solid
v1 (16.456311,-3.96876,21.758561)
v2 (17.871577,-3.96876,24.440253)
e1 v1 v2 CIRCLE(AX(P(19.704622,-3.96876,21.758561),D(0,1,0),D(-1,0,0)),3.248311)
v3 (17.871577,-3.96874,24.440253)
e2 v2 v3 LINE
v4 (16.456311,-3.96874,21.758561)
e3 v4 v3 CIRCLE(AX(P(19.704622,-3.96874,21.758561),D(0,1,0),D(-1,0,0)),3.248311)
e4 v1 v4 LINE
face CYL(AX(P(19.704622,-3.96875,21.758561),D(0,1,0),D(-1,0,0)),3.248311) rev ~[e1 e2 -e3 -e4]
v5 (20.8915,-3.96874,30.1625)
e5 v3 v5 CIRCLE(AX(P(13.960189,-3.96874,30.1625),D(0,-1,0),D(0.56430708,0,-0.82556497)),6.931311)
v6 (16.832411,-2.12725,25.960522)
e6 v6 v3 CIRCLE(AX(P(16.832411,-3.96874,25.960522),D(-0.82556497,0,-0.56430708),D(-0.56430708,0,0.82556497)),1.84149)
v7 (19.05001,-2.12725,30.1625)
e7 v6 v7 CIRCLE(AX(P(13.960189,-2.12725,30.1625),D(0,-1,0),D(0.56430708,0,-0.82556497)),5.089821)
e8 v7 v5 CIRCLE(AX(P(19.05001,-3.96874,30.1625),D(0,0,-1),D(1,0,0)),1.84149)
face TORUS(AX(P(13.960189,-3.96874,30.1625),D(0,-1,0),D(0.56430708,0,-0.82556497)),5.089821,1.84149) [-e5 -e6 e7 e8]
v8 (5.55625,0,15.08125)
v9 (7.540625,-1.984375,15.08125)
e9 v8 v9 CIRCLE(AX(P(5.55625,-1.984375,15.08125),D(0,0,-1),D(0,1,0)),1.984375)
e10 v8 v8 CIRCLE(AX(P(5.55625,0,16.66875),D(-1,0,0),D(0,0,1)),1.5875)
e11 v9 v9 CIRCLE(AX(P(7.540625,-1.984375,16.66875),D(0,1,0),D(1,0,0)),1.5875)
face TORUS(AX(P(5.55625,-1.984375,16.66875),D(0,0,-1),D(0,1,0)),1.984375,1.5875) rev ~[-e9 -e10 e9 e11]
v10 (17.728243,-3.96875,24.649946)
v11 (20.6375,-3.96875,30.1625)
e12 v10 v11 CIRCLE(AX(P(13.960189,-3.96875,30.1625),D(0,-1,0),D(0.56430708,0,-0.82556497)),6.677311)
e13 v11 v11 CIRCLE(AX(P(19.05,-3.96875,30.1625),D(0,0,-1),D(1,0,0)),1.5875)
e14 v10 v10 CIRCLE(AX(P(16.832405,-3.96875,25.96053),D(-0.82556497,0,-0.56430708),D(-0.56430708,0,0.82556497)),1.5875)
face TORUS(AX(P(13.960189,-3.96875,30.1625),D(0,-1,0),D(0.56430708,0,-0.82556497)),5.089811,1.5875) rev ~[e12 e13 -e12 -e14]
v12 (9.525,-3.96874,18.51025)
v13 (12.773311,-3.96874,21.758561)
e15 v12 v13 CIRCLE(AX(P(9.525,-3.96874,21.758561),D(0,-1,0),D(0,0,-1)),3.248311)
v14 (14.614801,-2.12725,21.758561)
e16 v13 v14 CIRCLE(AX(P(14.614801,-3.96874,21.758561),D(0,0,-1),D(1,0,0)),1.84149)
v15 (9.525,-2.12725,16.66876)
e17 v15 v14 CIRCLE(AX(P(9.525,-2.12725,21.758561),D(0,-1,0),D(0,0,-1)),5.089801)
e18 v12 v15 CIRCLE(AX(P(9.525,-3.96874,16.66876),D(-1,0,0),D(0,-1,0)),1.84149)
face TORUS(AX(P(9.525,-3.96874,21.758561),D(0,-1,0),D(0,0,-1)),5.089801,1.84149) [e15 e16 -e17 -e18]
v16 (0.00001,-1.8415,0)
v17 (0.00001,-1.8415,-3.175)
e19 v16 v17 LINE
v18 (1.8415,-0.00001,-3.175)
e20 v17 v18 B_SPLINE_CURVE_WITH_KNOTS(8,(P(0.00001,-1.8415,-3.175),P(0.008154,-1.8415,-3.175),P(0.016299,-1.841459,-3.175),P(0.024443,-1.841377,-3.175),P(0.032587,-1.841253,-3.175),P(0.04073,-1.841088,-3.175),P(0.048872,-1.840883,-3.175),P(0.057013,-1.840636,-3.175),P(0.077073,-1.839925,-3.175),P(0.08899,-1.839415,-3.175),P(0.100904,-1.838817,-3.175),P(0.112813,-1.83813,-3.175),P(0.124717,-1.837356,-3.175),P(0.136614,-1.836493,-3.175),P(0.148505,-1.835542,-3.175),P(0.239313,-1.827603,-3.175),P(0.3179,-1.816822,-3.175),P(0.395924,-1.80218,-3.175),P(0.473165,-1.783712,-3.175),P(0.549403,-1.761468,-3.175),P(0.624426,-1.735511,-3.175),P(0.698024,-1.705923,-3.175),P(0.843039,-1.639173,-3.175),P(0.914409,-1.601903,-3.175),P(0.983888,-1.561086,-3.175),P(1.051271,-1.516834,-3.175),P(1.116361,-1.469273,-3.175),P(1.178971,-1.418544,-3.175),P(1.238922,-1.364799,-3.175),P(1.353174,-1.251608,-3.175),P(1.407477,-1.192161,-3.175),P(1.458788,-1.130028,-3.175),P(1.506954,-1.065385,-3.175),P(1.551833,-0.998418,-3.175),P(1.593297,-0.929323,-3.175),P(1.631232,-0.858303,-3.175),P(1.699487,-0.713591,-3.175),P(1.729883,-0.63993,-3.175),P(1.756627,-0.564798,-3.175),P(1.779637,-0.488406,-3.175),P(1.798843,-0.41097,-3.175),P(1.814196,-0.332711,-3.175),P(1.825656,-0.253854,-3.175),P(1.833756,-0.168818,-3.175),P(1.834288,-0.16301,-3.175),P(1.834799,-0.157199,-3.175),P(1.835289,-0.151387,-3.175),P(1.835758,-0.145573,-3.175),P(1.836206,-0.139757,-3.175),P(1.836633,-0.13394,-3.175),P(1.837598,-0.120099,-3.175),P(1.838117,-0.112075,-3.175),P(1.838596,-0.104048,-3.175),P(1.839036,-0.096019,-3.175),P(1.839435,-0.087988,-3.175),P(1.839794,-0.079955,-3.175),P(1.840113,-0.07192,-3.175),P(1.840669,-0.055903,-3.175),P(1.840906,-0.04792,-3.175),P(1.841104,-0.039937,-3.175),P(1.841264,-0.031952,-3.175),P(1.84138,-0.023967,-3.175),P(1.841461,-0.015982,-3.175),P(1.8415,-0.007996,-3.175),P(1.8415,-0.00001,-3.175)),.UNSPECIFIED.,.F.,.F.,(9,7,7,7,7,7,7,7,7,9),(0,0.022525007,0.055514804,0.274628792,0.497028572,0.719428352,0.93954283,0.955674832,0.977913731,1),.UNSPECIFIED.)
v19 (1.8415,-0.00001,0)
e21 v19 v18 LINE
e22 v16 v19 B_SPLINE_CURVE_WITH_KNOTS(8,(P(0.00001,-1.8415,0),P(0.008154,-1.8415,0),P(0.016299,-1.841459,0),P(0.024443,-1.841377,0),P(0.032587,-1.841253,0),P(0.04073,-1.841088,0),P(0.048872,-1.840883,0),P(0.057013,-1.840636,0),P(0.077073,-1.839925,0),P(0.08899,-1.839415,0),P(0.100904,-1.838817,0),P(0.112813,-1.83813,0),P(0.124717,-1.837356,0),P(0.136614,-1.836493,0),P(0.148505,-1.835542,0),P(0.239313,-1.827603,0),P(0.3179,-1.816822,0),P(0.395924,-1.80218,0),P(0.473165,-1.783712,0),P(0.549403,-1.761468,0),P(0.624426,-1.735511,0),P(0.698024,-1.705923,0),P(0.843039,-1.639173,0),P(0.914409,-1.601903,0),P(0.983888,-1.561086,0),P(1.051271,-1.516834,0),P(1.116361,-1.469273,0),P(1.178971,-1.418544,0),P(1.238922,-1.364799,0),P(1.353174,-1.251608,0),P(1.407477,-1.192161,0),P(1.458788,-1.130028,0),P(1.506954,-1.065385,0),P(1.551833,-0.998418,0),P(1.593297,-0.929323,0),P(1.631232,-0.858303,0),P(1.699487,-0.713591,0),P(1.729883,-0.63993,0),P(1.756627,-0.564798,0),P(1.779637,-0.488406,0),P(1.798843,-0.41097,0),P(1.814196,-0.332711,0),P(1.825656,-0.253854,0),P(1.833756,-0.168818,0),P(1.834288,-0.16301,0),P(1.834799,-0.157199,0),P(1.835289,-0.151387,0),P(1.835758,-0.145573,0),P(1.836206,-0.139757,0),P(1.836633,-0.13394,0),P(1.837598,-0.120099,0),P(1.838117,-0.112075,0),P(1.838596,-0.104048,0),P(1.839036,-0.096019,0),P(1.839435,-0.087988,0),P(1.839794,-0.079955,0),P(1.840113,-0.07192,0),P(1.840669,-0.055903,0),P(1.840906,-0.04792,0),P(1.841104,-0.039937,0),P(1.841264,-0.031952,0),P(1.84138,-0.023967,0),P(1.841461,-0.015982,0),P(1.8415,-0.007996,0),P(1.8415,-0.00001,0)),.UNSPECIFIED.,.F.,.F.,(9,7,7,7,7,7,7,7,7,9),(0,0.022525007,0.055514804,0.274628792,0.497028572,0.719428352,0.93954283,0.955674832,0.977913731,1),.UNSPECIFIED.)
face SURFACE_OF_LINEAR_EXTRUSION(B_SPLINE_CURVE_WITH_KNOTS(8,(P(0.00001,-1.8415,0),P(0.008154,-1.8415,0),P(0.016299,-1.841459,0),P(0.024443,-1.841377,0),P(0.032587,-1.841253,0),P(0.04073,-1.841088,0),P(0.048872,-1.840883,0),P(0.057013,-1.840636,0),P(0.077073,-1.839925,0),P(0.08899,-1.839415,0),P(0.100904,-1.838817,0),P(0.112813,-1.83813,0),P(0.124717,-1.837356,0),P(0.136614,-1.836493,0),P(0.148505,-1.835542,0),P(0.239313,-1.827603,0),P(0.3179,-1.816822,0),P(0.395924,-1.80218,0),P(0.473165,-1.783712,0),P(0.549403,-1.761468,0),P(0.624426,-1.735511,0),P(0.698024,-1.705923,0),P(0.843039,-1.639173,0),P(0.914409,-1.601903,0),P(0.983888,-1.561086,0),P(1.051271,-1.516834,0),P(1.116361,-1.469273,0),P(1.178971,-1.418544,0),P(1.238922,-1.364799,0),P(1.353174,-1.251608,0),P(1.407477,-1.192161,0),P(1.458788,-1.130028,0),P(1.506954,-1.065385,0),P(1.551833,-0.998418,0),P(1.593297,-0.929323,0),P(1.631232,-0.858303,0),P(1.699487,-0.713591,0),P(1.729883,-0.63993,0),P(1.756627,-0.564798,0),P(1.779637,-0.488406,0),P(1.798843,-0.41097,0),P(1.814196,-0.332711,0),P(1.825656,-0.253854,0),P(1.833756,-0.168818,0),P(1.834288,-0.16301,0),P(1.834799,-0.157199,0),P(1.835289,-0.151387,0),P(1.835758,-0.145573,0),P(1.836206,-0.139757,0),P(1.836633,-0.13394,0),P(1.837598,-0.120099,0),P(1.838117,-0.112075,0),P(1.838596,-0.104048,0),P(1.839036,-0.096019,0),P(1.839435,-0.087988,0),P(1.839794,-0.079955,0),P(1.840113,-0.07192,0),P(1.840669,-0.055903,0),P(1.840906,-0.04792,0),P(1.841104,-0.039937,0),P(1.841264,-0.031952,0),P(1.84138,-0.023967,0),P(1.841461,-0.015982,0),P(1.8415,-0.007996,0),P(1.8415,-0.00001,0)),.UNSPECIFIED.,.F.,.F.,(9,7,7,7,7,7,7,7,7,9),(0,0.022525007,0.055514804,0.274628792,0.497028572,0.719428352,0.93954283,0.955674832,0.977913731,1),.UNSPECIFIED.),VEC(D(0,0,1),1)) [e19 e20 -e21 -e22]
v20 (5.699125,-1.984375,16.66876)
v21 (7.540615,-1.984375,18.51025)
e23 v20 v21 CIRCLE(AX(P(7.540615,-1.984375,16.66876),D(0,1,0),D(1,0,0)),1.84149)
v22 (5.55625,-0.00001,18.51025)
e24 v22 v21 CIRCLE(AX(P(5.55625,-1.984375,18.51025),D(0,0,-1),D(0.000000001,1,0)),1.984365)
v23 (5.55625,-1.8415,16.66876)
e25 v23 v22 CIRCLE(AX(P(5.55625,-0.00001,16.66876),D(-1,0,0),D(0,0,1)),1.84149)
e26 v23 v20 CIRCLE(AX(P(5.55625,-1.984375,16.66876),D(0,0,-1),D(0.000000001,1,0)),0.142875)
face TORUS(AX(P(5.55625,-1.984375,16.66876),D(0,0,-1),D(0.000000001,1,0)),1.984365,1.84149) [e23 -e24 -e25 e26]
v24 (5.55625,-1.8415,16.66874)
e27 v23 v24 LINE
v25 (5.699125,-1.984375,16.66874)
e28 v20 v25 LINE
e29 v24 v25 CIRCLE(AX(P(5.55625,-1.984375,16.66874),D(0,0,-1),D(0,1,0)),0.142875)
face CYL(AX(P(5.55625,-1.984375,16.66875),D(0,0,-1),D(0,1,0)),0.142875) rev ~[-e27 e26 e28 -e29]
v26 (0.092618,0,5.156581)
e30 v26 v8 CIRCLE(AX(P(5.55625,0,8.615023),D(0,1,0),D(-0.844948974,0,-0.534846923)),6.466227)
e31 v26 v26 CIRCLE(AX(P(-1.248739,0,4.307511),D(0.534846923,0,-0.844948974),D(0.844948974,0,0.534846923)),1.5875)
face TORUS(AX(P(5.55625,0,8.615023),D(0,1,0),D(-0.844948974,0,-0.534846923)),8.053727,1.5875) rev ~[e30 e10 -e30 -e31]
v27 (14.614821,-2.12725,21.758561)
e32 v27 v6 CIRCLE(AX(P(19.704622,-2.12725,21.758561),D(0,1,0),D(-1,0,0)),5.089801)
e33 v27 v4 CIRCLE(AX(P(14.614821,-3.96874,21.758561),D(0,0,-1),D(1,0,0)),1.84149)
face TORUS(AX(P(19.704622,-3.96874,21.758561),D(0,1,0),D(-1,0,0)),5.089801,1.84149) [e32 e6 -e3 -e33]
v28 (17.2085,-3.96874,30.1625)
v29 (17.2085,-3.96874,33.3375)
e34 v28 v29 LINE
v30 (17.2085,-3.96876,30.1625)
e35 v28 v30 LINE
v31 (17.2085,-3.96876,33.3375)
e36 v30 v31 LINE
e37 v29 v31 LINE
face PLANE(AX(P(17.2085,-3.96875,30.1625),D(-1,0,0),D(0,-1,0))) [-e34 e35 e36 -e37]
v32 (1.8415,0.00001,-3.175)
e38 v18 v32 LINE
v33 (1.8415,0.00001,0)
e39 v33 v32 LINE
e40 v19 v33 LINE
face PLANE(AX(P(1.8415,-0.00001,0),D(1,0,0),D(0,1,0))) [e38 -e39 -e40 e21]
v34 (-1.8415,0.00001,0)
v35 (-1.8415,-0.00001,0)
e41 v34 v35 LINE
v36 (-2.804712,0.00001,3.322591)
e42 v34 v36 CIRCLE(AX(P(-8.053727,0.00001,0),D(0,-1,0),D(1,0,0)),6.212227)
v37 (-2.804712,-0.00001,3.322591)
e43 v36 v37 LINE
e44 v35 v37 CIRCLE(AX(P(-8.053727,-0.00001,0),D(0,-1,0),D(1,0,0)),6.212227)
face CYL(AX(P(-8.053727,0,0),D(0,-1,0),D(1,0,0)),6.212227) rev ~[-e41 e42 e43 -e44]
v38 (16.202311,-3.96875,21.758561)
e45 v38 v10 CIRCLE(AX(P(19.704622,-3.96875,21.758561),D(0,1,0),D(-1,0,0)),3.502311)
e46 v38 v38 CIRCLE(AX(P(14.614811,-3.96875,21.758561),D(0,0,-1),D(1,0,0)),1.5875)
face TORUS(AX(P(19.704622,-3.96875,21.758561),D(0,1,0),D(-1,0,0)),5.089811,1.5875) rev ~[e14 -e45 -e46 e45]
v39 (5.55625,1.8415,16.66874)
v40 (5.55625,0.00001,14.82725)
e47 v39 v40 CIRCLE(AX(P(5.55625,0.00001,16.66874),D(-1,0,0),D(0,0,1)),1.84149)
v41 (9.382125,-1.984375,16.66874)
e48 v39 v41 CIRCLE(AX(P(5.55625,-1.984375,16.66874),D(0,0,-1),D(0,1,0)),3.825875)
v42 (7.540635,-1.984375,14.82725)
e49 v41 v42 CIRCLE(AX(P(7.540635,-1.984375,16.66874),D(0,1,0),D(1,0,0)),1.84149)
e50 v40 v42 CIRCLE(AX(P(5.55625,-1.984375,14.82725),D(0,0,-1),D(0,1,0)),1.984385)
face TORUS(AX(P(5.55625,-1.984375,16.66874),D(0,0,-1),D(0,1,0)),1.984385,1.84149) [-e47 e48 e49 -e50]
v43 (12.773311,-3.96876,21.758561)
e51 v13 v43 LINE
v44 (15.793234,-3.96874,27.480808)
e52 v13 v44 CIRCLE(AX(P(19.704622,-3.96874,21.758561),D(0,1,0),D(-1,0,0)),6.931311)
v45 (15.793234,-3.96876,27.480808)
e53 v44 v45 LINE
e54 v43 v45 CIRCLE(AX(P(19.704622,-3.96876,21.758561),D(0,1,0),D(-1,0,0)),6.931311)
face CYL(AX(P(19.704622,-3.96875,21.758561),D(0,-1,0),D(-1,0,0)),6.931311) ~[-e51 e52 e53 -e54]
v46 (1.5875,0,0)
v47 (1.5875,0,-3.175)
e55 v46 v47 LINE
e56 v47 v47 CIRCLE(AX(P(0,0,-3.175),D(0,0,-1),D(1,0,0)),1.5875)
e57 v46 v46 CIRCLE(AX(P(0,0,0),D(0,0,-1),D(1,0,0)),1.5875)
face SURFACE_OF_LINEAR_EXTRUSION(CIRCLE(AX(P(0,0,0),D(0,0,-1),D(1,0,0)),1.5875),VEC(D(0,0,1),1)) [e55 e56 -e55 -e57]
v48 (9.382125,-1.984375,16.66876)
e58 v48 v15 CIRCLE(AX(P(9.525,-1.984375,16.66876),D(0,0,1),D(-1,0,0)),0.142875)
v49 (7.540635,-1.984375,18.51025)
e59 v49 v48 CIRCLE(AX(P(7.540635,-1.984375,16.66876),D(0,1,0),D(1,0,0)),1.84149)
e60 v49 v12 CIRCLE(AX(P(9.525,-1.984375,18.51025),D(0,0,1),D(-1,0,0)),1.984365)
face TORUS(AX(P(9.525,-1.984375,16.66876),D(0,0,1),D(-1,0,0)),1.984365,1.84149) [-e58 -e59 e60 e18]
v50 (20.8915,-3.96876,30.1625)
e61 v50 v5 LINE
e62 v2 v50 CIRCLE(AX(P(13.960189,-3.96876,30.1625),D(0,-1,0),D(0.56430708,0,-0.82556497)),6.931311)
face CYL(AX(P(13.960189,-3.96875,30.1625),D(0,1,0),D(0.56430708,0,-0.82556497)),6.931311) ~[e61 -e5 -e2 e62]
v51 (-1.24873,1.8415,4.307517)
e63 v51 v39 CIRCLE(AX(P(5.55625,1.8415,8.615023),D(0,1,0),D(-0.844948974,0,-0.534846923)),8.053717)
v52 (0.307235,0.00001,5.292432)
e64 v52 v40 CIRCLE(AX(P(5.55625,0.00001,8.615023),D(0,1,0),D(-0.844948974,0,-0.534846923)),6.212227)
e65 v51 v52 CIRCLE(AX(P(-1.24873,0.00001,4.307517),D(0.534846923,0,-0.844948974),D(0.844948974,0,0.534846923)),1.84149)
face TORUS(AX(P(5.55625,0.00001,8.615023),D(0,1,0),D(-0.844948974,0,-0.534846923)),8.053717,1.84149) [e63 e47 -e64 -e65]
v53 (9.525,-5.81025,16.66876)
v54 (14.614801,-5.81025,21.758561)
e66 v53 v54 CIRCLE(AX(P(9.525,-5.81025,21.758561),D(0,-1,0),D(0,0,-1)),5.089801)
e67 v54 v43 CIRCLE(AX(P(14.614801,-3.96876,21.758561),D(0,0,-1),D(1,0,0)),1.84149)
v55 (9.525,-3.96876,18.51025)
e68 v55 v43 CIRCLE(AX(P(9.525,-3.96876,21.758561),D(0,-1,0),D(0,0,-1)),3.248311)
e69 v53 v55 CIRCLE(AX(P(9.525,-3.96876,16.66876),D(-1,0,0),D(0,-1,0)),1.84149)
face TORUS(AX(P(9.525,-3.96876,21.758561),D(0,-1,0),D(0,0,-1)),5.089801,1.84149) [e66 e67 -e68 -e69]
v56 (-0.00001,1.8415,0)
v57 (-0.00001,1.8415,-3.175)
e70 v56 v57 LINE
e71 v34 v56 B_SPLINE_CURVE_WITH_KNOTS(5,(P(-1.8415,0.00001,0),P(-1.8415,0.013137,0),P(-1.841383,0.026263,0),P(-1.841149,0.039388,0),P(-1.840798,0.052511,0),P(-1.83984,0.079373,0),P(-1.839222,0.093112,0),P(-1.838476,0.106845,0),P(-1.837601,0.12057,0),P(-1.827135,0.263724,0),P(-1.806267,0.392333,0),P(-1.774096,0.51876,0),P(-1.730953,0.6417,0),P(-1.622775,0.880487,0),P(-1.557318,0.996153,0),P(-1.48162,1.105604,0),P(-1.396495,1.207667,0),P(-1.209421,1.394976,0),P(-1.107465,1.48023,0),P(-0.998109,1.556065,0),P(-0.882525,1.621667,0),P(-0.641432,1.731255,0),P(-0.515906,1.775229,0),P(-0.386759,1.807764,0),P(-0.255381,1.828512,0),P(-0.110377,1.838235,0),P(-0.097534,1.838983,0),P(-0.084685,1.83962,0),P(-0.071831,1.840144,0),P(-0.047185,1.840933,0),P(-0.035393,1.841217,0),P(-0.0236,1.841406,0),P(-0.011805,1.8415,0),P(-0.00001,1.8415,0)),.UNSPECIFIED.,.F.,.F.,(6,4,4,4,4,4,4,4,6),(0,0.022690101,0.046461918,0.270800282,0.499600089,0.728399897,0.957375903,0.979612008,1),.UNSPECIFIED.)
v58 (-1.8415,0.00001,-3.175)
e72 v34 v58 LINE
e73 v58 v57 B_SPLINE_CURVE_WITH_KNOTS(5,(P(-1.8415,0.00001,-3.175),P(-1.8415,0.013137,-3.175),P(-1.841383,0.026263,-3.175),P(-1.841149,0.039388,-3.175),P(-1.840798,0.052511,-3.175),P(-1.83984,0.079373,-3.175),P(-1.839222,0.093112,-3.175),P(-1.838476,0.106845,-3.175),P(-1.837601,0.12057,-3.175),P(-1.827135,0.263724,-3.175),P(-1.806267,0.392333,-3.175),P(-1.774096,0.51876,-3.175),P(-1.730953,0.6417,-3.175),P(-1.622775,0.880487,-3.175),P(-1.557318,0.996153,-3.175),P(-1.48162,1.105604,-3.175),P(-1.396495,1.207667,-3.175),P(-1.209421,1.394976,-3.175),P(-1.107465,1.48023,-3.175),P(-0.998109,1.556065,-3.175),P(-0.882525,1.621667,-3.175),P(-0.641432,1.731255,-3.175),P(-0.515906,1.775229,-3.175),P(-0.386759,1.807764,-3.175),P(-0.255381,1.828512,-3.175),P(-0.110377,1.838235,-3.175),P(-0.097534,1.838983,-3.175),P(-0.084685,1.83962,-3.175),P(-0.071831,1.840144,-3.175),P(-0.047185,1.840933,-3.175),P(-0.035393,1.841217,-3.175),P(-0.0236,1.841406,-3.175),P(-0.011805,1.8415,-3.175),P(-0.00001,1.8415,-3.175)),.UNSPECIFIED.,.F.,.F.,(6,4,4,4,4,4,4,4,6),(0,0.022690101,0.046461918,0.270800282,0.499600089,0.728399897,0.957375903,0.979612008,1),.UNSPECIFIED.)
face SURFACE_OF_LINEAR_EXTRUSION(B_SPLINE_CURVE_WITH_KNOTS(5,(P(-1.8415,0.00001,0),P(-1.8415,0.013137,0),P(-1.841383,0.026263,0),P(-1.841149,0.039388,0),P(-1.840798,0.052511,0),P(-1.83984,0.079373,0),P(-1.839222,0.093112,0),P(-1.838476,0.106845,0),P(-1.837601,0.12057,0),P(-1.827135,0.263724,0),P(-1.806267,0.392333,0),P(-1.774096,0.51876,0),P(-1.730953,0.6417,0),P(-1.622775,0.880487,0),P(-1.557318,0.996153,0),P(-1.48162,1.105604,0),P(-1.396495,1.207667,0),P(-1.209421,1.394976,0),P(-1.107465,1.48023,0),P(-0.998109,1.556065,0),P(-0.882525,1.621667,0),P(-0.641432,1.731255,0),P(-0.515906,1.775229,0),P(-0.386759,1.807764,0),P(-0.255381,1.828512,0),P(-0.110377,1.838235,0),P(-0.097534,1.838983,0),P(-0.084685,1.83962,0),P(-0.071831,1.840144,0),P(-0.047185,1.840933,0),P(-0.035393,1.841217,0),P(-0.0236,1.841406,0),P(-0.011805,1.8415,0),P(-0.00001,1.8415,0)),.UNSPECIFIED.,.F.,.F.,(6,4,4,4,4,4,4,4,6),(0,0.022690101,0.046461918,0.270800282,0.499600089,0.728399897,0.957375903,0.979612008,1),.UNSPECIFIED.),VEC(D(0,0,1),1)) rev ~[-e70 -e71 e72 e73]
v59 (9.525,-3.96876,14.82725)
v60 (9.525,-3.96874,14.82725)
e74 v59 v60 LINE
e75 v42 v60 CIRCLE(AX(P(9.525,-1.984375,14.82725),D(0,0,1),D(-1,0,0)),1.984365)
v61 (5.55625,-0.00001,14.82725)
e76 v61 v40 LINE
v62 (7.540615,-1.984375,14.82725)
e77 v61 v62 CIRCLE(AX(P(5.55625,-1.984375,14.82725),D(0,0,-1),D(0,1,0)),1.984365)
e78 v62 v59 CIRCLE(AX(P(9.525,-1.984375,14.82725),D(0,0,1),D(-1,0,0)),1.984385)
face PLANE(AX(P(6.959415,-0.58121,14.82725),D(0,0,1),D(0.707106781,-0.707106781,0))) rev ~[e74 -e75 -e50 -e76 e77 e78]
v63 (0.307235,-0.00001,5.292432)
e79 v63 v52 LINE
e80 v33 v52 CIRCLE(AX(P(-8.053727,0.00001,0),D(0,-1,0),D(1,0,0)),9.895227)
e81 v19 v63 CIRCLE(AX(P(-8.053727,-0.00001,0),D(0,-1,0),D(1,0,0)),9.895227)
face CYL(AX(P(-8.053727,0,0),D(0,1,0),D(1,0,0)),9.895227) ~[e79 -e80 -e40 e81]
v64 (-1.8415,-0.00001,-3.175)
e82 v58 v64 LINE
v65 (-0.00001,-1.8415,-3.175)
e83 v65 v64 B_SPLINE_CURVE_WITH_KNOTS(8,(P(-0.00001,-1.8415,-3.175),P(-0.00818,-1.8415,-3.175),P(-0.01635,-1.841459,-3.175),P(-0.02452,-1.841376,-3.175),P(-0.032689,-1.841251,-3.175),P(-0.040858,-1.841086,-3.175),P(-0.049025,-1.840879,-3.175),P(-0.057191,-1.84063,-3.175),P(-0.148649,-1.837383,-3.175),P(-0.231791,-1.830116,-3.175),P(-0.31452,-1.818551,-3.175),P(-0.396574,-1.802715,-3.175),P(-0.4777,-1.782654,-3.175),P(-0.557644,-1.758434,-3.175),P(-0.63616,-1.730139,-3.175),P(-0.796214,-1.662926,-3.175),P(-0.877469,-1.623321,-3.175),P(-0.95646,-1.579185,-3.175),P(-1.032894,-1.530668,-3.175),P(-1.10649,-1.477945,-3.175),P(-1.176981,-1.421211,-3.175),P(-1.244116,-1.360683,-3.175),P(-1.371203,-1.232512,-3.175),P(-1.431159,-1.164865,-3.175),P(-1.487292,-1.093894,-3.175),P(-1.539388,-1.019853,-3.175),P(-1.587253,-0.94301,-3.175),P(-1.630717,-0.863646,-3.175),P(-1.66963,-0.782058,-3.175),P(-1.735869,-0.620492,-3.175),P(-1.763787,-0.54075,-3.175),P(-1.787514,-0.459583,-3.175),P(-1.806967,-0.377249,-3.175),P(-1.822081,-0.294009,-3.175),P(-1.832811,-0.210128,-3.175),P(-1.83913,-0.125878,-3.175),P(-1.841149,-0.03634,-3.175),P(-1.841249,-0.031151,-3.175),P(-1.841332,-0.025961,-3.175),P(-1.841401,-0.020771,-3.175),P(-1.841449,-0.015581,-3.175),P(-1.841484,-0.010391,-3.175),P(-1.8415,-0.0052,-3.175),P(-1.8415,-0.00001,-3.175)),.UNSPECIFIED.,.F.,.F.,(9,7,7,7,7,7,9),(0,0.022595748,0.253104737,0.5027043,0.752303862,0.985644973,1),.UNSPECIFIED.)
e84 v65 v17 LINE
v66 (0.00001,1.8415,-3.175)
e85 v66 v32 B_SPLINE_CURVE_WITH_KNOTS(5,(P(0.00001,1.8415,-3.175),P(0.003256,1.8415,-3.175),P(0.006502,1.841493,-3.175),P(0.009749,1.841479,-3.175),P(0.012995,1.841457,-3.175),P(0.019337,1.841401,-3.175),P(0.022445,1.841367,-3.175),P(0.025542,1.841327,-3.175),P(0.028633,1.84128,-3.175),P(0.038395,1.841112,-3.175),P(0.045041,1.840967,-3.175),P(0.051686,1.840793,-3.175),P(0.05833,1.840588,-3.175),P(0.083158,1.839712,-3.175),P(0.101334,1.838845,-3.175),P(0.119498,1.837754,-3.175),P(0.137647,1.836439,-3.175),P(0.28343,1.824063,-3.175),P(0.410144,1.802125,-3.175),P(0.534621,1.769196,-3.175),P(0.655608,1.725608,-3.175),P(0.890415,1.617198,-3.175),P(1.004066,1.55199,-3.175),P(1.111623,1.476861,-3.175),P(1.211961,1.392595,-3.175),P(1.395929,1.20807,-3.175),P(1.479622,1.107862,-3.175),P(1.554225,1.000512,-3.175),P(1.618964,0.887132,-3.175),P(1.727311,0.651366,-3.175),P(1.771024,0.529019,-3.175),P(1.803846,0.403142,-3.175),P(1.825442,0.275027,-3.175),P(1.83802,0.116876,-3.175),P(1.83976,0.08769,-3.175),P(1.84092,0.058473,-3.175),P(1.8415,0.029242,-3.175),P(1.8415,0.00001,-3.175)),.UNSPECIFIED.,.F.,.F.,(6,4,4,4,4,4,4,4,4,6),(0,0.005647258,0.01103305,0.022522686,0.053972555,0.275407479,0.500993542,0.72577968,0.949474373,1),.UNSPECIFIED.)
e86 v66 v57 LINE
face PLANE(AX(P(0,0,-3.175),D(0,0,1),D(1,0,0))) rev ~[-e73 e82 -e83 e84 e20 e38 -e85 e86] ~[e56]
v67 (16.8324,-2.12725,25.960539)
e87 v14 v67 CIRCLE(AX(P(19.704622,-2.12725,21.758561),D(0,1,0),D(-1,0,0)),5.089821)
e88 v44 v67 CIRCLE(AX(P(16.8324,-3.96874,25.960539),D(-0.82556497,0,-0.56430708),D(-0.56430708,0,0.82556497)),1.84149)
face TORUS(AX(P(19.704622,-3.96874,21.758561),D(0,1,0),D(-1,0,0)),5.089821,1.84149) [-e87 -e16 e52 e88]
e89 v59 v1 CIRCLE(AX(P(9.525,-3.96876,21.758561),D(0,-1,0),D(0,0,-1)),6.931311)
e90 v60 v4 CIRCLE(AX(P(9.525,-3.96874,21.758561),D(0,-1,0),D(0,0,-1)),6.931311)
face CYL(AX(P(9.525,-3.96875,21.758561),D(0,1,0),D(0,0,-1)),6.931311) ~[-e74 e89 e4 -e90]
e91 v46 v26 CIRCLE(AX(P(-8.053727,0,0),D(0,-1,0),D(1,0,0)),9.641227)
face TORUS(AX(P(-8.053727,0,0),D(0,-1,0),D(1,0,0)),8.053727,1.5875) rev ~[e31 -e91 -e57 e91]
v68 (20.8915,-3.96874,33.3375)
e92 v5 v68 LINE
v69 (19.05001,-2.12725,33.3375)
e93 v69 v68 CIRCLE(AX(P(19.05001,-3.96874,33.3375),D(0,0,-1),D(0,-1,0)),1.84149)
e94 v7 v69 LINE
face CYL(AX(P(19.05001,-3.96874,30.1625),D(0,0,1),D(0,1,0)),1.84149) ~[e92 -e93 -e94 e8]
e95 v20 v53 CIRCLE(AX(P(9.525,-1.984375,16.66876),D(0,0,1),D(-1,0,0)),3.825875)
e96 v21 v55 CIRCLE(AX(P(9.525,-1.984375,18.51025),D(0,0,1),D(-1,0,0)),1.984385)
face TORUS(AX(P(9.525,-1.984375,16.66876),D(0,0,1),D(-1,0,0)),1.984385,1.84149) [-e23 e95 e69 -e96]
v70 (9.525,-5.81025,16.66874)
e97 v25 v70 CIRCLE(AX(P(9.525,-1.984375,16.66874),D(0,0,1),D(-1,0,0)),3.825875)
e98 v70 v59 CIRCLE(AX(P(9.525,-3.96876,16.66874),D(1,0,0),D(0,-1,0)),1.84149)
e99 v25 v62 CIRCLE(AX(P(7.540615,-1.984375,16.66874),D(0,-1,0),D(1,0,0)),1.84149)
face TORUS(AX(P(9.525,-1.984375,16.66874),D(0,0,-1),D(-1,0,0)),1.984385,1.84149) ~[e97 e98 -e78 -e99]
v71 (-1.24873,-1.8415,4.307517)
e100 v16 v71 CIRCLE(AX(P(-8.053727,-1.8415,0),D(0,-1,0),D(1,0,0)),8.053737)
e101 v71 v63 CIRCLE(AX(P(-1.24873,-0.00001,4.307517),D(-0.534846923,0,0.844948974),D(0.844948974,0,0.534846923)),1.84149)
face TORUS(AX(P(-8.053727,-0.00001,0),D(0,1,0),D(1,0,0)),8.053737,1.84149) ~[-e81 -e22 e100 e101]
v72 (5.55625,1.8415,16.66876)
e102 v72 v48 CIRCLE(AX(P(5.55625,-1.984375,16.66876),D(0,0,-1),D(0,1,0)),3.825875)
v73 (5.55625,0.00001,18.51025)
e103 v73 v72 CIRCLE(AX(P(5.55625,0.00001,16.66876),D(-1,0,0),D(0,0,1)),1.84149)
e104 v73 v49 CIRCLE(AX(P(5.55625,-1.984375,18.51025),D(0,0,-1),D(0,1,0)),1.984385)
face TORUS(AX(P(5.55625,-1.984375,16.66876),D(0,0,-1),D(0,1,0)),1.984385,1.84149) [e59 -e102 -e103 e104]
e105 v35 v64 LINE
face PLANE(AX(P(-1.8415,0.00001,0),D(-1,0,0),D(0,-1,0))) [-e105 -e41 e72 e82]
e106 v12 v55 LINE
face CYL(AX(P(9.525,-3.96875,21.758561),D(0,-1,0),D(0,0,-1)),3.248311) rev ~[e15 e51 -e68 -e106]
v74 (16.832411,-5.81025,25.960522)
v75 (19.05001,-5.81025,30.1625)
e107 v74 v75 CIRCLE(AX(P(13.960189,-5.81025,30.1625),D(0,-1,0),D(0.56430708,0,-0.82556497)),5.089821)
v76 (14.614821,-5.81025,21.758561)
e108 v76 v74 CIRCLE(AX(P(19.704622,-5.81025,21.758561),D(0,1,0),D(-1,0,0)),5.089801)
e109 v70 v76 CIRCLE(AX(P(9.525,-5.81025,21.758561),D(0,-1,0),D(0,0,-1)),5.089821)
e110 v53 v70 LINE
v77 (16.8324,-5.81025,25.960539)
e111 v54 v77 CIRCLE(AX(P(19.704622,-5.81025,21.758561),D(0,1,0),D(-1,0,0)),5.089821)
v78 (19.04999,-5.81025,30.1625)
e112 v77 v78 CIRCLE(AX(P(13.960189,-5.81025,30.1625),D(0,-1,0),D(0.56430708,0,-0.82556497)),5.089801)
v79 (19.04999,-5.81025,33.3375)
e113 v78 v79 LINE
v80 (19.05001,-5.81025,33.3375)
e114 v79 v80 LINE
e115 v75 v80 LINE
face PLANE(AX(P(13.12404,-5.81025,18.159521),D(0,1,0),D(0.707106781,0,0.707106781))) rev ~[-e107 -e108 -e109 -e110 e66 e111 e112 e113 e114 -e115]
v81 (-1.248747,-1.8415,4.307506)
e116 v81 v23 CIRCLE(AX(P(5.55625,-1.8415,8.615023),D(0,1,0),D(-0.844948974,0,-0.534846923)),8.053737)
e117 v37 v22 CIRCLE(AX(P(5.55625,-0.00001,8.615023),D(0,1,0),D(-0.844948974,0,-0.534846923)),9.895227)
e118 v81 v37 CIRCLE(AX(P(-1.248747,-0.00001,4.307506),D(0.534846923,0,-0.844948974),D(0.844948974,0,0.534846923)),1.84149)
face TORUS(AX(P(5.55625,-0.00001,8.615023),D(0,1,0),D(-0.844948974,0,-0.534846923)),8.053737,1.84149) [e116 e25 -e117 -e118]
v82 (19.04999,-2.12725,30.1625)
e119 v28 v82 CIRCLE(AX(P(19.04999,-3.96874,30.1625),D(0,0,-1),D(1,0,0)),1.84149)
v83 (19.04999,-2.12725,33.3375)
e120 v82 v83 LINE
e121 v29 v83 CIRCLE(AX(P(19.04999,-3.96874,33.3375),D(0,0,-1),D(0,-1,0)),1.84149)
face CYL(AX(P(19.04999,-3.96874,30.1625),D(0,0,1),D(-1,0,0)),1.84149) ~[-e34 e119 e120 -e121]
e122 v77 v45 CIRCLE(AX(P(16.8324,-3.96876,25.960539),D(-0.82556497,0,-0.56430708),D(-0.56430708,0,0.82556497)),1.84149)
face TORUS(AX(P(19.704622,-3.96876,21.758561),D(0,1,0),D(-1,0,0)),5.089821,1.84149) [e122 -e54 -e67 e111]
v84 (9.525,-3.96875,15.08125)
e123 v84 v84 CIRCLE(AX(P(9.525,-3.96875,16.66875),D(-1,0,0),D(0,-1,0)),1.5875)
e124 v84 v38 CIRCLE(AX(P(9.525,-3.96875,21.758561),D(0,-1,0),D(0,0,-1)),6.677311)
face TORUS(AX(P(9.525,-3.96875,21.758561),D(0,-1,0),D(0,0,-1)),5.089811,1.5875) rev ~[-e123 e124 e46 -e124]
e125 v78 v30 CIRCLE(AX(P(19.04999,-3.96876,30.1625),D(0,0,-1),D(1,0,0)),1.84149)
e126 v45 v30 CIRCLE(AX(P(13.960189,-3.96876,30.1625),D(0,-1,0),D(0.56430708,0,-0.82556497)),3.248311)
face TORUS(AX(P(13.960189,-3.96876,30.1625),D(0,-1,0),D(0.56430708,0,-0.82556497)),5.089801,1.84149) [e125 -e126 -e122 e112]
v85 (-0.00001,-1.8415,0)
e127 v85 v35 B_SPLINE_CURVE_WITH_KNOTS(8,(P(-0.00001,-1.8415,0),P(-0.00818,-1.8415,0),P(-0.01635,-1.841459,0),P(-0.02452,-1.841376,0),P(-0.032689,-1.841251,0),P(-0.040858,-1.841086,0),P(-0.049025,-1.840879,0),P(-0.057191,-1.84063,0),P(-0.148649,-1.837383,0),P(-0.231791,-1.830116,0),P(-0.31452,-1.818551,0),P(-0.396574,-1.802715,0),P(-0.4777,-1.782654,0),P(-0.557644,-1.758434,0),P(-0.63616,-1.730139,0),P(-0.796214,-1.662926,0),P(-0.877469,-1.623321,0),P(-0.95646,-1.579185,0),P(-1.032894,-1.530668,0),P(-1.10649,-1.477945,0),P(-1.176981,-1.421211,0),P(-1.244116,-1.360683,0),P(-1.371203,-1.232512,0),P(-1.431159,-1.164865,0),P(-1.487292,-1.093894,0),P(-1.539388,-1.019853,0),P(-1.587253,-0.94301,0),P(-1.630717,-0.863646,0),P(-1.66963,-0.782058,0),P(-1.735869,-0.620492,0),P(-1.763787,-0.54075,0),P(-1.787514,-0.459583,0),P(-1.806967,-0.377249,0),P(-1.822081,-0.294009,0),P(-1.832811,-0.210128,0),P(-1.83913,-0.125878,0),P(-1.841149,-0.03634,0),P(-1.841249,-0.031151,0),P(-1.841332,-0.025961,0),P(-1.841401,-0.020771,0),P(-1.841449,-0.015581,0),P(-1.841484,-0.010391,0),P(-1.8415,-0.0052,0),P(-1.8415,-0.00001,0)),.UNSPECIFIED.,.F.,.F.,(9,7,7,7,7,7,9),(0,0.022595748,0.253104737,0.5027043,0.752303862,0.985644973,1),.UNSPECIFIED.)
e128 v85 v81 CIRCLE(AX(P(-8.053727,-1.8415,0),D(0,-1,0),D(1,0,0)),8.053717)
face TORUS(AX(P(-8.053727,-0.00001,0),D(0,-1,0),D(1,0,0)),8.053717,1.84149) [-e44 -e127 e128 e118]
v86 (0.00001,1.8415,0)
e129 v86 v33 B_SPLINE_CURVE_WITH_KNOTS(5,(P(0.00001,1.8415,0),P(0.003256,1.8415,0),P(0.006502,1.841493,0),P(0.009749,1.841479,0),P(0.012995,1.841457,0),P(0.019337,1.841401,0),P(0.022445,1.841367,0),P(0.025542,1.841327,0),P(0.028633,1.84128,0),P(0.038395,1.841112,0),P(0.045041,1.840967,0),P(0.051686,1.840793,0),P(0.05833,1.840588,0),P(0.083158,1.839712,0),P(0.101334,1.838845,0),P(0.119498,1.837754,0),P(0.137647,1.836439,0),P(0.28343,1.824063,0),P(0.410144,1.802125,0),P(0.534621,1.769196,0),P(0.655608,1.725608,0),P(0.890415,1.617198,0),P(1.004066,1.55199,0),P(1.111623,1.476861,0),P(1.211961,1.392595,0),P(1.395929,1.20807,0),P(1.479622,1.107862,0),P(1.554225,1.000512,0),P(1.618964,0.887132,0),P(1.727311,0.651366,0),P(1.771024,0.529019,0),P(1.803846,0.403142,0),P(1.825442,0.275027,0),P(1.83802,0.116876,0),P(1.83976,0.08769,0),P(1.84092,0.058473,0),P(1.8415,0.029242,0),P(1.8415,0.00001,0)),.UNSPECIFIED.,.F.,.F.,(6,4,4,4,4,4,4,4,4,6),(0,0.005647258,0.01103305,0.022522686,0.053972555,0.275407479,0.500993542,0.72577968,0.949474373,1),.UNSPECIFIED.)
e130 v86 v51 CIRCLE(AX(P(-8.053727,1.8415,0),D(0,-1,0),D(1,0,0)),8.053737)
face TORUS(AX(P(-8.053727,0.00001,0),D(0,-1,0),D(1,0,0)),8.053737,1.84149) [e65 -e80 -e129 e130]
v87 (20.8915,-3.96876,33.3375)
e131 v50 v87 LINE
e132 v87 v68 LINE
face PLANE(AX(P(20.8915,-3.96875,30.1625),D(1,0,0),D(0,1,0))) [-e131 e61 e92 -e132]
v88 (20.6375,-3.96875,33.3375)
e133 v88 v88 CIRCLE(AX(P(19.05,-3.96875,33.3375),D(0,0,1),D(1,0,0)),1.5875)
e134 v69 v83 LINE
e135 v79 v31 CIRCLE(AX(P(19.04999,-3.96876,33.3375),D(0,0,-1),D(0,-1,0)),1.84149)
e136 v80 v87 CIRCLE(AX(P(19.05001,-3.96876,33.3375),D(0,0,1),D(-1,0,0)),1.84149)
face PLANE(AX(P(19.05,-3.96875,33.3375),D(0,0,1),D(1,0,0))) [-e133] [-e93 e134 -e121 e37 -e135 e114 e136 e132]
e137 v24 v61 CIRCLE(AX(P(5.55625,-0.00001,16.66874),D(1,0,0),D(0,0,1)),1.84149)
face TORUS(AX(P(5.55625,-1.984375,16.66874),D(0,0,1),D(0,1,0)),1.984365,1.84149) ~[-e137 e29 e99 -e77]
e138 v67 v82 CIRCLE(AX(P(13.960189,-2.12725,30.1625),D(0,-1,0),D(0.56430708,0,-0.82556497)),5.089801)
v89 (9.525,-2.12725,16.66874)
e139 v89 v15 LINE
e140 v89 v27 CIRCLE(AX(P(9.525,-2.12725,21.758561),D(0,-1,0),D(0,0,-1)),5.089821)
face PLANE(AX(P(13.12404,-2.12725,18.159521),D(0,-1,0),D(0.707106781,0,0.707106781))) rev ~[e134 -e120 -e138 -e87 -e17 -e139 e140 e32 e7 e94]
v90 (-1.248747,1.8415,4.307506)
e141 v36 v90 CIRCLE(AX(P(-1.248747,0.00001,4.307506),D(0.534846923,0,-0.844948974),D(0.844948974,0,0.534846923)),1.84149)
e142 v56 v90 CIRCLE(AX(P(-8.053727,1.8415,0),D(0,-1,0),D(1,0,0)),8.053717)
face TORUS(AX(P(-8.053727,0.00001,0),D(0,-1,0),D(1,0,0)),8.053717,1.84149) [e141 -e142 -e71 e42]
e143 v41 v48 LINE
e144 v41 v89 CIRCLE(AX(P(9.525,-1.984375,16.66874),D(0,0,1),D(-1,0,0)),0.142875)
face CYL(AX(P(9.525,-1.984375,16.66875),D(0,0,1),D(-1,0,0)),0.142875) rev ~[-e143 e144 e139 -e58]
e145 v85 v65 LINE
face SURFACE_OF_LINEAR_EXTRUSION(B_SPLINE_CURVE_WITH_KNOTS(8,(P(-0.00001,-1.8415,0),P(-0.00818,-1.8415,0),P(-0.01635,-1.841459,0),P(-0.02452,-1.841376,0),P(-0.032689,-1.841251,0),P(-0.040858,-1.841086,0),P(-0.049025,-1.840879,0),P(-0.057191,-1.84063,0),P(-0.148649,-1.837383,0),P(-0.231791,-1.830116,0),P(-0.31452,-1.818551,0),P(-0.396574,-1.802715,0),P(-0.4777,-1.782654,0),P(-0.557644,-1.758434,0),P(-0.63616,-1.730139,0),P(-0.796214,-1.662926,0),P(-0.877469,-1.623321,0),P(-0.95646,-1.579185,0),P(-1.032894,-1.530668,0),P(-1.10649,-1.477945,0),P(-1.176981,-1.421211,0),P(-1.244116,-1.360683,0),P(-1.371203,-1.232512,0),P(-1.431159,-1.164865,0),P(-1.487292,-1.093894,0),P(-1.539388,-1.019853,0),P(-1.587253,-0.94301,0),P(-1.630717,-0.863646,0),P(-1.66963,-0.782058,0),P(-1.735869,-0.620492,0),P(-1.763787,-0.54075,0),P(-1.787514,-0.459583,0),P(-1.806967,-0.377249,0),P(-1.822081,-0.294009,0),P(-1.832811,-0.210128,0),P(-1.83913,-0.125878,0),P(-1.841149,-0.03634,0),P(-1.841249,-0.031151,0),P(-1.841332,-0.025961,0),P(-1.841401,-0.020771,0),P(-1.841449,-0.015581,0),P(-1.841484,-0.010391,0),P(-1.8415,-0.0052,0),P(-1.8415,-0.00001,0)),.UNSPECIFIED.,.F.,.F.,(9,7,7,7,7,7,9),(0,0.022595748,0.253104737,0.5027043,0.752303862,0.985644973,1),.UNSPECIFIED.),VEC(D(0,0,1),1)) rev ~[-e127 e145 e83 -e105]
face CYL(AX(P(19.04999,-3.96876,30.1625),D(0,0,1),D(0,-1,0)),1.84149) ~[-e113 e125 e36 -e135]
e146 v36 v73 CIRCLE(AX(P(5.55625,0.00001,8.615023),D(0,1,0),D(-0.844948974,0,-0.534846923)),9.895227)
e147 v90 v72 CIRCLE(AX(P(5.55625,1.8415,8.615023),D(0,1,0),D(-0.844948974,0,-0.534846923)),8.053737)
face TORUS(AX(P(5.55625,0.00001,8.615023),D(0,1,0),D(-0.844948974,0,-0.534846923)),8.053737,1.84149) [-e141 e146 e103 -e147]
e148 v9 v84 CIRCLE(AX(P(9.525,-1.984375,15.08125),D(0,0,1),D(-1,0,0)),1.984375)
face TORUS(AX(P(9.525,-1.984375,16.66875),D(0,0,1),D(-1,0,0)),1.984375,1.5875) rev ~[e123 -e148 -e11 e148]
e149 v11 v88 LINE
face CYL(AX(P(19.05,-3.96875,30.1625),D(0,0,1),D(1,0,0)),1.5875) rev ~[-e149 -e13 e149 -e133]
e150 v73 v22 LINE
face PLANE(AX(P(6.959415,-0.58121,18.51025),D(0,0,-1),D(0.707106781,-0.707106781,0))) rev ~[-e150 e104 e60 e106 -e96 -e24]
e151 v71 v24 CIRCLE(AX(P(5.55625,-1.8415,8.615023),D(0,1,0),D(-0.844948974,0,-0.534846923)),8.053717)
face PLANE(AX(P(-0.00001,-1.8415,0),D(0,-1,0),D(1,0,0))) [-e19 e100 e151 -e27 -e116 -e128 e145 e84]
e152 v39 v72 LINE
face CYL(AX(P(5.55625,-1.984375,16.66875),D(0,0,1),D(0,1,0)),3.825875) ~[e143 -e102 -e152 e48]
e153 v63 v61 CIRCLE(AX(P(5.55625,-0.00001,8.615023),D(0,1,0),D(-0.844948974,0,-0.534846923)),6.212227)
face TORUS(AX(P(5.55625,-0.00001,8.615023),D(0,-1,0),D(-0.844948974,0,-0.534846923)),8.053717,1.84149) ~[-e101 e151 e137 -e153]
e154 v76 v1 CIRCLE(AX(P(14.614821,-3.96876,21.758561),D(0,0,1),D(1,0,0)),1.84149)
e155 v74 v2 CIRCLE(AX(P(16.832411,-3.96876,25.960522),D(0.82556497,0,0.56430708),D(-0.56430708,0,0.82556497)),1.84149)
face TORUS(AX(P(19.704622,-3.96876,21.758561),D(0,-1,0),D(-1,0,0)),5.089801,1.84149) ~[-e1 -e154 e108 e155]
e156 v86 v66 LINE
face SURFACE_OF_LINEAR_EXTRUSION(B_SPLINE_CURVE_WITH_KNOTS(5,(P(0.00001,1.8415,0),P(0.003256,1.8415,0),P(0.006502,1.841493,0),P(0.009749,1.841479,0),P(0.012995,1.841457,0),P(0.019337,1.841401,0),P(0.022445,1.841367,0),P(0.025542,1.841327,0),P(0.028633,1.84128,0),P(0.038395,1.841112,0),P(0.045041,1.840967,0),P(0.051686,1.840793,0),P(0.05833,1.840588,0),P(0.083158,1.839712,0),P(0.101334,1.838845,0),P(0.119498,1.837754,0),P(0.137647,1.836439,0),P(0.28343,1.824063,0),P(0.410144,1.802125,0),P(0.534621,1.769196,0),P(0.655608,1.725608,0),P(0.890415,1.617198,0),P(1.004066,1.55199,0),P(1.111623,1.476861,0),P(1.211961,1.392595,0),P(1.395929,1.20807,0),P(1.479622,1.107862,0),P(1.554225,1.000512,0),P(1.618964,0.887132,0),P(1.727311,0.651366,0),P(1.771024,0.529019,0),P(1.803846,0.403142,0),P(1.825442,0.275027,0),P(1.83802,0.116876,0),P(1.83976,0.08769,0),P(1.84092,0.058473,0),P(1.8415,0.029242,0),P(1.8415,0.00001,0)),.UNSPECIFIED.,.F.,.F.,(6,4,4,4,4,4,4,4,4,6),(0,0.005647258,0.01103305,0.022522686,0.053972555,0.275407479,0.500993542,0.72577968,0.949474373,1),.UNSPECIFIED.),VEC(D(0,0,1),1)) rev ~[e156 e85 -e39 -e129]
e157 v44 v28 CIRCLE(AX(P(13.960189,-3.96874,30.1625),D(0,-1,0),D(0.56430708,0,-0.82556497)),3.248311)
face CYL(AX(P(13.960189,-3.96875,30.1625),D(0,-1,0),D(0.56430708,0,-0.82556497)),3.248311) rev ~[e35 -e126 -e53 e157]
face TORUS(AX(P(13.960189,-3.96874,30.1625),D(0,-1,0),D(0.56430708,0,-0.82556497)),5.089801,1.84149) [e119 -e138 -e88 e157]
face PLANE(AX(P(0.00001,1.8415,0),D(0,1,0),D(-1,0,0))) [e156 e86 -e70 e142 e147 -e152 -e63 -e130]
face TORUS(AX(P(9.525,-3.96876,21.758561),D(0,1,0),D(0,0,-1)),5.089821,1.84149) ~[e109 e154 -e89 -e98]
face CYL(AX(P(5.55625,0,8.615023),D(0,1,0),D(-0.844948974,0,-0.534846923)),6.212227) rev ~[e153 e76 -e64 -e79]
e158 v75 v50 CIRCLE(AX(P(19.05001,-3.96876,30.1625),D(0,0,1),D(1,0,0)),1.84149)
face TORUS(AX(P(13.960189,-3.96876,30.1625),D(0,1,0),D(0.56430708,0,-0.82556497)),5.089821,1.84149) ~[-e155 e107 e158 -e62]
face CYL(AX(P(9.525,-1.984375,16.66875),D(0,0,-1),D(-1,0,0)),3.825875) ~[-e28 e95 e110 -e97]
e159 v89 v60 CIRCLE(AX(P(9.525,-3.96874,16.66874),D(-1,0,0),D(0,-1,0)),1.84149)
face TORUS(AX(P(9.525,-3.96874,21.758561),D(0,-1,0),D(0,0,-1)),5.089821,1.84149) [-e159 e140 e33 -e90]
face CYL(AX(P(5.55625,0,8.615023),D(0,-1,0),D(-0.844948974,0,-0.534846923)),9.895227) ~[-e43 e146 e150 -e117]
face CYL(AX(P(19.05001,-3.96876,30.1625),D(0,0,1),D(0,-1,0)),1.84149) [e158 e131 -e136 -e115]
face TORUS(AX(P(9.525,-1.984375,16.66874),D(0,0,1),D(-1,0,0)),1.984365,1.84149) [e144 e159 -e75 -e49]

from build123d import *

# Parameters (mm, degrees)
F0_W     = 3.683
F0_H     = 3.683
F0_R     = 1.5875
F7_R     = 1.84149
F8_DEPTH = 3.175


# Not quite as in the source:
# - a fillet or chamfer is up to 0.001 mm smaller than in the source, because OpenCascade refuses the exact size


with BuildPart() as f6:
    # F6: sweep along a path in F1, F3, F5
    with BuildLine(Plane.XZ) as f6_path:
        ThreePointArc((0, 0), (-0.3184817979, 2.2424318268), (-1.2487386917, 4.3075113083))
        ThreePointArc((-1.2487386917, 4.3075113083), (-1.4990333587, 12.4990284732), (5.55625, 16.66875))
    with BuildLine(Plane.XY.offset(16.66875)) as f6_path_2:
        ThreePointArc((5.55625, 0), (6.9594150189, -0.5812099811), (7.540625, -1.984375))
        ThreePointArc((7.540625, -1.984375), (8.1218349811, -3.3875400189), (9.525, -3.96875))
    with BuildLine(Plane.XZ.offset(3.96875)) as f6_path_3:
        ThreePointArc((9.525, 16.66875), (13.1240397855, 18.1595210907), (14.6148108762, 21.7585608762))
        ThreePointArc((14.6148108762, 21.7585608762), (15.2032212708, 24.1341804711), (16.8324054381, 25.9605304381))
        ThreePointArc((16.8324054381, 25.9605304381), (18.4615896054, 27.786880405), (19.05, 30.1625))
        Line((19.05, 30.1625), (19.05, 33.3375))
    # F0 (on Top) → F6 (sweep)
    with BuildSketch(Plane.XY):
        Rectangle(F0_W, F0_H)
        Circle(F0_R, mode=Mode.SUBTRACT)
    sweep(path=f6_path.line + f6_path_2.line + f6_path_3.line)

    # F7 (radius 1.8415 in the source; OpenCascade refuses exactly that, so slightly less here)
    f7_edges = [f6.edges().sort_by_distance(p)[0] for p in [
        (1.450197, 1.8415, 2.755168),
        (-2.08716, 1.8415, 1.729696),
        (-3.112237, 1.8415, 13.387114),
        (-3.112237, -1.8415, 13.387114),
        (-2.08716, -1.8415, 1.729696),
        (1.450197, -1.8415, 2.755168),
        (0.114171, -1.8415, 11.610943),
        (0.114171, 1.8415, 11.610943),
        (8.261552, 0.720927, 18.51025),
        (9.423972, -2.085403, 18.51025),
        (11.821903, -2.12725, 19.461658),
        (13.574609, -2.12725, 24.993683),
        (16.832977, -2.12725, 28.646383),
        (17.2085, -2.12725, 31.75),
        (8.261552, 0.720927, 14.82725),
        (9.423972, -2.085403, 14.82725),
        (14.426177, -2.12725, 16.857384),
        (16.831834, -2.12725, 23.274678),
        (20.090202, -2.12725, 26.927378),
        (20.8915, -2.12725, 31.75),
        (5.657278, -1.883347, 18.51025),
        (6.819698, -4.689677, 18.51025),
        (11.821903, -5.81025, 19.461658),
        (13.574609, -5.81025, 24.993683),
        (16.832977, -5.81025, 28.646383),
        (17.2085, -5.81025, 31.75),
        (5.657278, -1.883347, 14.82725),
        (6.819698, -4.689677, 14.82725),
        (14.426177, -5.81025, 16.857384),
        (16.831834, -5.81025, 23.274678),
        (20.090202, -5.81025, 26.927378),
        (20.8915, -5.81025, 31.75),
    ]]
    fillet(f7_edges, radius=F7_R)

    # F8 (add): a face of the model
    f8_faces = [f6.faces().sort_by_distance(p)[0] for p in [
        (1.7894145117, 0, 0),
    ]]
    extrude(f8_faces, amount=F8_DEPTH)


solid = f6.part
